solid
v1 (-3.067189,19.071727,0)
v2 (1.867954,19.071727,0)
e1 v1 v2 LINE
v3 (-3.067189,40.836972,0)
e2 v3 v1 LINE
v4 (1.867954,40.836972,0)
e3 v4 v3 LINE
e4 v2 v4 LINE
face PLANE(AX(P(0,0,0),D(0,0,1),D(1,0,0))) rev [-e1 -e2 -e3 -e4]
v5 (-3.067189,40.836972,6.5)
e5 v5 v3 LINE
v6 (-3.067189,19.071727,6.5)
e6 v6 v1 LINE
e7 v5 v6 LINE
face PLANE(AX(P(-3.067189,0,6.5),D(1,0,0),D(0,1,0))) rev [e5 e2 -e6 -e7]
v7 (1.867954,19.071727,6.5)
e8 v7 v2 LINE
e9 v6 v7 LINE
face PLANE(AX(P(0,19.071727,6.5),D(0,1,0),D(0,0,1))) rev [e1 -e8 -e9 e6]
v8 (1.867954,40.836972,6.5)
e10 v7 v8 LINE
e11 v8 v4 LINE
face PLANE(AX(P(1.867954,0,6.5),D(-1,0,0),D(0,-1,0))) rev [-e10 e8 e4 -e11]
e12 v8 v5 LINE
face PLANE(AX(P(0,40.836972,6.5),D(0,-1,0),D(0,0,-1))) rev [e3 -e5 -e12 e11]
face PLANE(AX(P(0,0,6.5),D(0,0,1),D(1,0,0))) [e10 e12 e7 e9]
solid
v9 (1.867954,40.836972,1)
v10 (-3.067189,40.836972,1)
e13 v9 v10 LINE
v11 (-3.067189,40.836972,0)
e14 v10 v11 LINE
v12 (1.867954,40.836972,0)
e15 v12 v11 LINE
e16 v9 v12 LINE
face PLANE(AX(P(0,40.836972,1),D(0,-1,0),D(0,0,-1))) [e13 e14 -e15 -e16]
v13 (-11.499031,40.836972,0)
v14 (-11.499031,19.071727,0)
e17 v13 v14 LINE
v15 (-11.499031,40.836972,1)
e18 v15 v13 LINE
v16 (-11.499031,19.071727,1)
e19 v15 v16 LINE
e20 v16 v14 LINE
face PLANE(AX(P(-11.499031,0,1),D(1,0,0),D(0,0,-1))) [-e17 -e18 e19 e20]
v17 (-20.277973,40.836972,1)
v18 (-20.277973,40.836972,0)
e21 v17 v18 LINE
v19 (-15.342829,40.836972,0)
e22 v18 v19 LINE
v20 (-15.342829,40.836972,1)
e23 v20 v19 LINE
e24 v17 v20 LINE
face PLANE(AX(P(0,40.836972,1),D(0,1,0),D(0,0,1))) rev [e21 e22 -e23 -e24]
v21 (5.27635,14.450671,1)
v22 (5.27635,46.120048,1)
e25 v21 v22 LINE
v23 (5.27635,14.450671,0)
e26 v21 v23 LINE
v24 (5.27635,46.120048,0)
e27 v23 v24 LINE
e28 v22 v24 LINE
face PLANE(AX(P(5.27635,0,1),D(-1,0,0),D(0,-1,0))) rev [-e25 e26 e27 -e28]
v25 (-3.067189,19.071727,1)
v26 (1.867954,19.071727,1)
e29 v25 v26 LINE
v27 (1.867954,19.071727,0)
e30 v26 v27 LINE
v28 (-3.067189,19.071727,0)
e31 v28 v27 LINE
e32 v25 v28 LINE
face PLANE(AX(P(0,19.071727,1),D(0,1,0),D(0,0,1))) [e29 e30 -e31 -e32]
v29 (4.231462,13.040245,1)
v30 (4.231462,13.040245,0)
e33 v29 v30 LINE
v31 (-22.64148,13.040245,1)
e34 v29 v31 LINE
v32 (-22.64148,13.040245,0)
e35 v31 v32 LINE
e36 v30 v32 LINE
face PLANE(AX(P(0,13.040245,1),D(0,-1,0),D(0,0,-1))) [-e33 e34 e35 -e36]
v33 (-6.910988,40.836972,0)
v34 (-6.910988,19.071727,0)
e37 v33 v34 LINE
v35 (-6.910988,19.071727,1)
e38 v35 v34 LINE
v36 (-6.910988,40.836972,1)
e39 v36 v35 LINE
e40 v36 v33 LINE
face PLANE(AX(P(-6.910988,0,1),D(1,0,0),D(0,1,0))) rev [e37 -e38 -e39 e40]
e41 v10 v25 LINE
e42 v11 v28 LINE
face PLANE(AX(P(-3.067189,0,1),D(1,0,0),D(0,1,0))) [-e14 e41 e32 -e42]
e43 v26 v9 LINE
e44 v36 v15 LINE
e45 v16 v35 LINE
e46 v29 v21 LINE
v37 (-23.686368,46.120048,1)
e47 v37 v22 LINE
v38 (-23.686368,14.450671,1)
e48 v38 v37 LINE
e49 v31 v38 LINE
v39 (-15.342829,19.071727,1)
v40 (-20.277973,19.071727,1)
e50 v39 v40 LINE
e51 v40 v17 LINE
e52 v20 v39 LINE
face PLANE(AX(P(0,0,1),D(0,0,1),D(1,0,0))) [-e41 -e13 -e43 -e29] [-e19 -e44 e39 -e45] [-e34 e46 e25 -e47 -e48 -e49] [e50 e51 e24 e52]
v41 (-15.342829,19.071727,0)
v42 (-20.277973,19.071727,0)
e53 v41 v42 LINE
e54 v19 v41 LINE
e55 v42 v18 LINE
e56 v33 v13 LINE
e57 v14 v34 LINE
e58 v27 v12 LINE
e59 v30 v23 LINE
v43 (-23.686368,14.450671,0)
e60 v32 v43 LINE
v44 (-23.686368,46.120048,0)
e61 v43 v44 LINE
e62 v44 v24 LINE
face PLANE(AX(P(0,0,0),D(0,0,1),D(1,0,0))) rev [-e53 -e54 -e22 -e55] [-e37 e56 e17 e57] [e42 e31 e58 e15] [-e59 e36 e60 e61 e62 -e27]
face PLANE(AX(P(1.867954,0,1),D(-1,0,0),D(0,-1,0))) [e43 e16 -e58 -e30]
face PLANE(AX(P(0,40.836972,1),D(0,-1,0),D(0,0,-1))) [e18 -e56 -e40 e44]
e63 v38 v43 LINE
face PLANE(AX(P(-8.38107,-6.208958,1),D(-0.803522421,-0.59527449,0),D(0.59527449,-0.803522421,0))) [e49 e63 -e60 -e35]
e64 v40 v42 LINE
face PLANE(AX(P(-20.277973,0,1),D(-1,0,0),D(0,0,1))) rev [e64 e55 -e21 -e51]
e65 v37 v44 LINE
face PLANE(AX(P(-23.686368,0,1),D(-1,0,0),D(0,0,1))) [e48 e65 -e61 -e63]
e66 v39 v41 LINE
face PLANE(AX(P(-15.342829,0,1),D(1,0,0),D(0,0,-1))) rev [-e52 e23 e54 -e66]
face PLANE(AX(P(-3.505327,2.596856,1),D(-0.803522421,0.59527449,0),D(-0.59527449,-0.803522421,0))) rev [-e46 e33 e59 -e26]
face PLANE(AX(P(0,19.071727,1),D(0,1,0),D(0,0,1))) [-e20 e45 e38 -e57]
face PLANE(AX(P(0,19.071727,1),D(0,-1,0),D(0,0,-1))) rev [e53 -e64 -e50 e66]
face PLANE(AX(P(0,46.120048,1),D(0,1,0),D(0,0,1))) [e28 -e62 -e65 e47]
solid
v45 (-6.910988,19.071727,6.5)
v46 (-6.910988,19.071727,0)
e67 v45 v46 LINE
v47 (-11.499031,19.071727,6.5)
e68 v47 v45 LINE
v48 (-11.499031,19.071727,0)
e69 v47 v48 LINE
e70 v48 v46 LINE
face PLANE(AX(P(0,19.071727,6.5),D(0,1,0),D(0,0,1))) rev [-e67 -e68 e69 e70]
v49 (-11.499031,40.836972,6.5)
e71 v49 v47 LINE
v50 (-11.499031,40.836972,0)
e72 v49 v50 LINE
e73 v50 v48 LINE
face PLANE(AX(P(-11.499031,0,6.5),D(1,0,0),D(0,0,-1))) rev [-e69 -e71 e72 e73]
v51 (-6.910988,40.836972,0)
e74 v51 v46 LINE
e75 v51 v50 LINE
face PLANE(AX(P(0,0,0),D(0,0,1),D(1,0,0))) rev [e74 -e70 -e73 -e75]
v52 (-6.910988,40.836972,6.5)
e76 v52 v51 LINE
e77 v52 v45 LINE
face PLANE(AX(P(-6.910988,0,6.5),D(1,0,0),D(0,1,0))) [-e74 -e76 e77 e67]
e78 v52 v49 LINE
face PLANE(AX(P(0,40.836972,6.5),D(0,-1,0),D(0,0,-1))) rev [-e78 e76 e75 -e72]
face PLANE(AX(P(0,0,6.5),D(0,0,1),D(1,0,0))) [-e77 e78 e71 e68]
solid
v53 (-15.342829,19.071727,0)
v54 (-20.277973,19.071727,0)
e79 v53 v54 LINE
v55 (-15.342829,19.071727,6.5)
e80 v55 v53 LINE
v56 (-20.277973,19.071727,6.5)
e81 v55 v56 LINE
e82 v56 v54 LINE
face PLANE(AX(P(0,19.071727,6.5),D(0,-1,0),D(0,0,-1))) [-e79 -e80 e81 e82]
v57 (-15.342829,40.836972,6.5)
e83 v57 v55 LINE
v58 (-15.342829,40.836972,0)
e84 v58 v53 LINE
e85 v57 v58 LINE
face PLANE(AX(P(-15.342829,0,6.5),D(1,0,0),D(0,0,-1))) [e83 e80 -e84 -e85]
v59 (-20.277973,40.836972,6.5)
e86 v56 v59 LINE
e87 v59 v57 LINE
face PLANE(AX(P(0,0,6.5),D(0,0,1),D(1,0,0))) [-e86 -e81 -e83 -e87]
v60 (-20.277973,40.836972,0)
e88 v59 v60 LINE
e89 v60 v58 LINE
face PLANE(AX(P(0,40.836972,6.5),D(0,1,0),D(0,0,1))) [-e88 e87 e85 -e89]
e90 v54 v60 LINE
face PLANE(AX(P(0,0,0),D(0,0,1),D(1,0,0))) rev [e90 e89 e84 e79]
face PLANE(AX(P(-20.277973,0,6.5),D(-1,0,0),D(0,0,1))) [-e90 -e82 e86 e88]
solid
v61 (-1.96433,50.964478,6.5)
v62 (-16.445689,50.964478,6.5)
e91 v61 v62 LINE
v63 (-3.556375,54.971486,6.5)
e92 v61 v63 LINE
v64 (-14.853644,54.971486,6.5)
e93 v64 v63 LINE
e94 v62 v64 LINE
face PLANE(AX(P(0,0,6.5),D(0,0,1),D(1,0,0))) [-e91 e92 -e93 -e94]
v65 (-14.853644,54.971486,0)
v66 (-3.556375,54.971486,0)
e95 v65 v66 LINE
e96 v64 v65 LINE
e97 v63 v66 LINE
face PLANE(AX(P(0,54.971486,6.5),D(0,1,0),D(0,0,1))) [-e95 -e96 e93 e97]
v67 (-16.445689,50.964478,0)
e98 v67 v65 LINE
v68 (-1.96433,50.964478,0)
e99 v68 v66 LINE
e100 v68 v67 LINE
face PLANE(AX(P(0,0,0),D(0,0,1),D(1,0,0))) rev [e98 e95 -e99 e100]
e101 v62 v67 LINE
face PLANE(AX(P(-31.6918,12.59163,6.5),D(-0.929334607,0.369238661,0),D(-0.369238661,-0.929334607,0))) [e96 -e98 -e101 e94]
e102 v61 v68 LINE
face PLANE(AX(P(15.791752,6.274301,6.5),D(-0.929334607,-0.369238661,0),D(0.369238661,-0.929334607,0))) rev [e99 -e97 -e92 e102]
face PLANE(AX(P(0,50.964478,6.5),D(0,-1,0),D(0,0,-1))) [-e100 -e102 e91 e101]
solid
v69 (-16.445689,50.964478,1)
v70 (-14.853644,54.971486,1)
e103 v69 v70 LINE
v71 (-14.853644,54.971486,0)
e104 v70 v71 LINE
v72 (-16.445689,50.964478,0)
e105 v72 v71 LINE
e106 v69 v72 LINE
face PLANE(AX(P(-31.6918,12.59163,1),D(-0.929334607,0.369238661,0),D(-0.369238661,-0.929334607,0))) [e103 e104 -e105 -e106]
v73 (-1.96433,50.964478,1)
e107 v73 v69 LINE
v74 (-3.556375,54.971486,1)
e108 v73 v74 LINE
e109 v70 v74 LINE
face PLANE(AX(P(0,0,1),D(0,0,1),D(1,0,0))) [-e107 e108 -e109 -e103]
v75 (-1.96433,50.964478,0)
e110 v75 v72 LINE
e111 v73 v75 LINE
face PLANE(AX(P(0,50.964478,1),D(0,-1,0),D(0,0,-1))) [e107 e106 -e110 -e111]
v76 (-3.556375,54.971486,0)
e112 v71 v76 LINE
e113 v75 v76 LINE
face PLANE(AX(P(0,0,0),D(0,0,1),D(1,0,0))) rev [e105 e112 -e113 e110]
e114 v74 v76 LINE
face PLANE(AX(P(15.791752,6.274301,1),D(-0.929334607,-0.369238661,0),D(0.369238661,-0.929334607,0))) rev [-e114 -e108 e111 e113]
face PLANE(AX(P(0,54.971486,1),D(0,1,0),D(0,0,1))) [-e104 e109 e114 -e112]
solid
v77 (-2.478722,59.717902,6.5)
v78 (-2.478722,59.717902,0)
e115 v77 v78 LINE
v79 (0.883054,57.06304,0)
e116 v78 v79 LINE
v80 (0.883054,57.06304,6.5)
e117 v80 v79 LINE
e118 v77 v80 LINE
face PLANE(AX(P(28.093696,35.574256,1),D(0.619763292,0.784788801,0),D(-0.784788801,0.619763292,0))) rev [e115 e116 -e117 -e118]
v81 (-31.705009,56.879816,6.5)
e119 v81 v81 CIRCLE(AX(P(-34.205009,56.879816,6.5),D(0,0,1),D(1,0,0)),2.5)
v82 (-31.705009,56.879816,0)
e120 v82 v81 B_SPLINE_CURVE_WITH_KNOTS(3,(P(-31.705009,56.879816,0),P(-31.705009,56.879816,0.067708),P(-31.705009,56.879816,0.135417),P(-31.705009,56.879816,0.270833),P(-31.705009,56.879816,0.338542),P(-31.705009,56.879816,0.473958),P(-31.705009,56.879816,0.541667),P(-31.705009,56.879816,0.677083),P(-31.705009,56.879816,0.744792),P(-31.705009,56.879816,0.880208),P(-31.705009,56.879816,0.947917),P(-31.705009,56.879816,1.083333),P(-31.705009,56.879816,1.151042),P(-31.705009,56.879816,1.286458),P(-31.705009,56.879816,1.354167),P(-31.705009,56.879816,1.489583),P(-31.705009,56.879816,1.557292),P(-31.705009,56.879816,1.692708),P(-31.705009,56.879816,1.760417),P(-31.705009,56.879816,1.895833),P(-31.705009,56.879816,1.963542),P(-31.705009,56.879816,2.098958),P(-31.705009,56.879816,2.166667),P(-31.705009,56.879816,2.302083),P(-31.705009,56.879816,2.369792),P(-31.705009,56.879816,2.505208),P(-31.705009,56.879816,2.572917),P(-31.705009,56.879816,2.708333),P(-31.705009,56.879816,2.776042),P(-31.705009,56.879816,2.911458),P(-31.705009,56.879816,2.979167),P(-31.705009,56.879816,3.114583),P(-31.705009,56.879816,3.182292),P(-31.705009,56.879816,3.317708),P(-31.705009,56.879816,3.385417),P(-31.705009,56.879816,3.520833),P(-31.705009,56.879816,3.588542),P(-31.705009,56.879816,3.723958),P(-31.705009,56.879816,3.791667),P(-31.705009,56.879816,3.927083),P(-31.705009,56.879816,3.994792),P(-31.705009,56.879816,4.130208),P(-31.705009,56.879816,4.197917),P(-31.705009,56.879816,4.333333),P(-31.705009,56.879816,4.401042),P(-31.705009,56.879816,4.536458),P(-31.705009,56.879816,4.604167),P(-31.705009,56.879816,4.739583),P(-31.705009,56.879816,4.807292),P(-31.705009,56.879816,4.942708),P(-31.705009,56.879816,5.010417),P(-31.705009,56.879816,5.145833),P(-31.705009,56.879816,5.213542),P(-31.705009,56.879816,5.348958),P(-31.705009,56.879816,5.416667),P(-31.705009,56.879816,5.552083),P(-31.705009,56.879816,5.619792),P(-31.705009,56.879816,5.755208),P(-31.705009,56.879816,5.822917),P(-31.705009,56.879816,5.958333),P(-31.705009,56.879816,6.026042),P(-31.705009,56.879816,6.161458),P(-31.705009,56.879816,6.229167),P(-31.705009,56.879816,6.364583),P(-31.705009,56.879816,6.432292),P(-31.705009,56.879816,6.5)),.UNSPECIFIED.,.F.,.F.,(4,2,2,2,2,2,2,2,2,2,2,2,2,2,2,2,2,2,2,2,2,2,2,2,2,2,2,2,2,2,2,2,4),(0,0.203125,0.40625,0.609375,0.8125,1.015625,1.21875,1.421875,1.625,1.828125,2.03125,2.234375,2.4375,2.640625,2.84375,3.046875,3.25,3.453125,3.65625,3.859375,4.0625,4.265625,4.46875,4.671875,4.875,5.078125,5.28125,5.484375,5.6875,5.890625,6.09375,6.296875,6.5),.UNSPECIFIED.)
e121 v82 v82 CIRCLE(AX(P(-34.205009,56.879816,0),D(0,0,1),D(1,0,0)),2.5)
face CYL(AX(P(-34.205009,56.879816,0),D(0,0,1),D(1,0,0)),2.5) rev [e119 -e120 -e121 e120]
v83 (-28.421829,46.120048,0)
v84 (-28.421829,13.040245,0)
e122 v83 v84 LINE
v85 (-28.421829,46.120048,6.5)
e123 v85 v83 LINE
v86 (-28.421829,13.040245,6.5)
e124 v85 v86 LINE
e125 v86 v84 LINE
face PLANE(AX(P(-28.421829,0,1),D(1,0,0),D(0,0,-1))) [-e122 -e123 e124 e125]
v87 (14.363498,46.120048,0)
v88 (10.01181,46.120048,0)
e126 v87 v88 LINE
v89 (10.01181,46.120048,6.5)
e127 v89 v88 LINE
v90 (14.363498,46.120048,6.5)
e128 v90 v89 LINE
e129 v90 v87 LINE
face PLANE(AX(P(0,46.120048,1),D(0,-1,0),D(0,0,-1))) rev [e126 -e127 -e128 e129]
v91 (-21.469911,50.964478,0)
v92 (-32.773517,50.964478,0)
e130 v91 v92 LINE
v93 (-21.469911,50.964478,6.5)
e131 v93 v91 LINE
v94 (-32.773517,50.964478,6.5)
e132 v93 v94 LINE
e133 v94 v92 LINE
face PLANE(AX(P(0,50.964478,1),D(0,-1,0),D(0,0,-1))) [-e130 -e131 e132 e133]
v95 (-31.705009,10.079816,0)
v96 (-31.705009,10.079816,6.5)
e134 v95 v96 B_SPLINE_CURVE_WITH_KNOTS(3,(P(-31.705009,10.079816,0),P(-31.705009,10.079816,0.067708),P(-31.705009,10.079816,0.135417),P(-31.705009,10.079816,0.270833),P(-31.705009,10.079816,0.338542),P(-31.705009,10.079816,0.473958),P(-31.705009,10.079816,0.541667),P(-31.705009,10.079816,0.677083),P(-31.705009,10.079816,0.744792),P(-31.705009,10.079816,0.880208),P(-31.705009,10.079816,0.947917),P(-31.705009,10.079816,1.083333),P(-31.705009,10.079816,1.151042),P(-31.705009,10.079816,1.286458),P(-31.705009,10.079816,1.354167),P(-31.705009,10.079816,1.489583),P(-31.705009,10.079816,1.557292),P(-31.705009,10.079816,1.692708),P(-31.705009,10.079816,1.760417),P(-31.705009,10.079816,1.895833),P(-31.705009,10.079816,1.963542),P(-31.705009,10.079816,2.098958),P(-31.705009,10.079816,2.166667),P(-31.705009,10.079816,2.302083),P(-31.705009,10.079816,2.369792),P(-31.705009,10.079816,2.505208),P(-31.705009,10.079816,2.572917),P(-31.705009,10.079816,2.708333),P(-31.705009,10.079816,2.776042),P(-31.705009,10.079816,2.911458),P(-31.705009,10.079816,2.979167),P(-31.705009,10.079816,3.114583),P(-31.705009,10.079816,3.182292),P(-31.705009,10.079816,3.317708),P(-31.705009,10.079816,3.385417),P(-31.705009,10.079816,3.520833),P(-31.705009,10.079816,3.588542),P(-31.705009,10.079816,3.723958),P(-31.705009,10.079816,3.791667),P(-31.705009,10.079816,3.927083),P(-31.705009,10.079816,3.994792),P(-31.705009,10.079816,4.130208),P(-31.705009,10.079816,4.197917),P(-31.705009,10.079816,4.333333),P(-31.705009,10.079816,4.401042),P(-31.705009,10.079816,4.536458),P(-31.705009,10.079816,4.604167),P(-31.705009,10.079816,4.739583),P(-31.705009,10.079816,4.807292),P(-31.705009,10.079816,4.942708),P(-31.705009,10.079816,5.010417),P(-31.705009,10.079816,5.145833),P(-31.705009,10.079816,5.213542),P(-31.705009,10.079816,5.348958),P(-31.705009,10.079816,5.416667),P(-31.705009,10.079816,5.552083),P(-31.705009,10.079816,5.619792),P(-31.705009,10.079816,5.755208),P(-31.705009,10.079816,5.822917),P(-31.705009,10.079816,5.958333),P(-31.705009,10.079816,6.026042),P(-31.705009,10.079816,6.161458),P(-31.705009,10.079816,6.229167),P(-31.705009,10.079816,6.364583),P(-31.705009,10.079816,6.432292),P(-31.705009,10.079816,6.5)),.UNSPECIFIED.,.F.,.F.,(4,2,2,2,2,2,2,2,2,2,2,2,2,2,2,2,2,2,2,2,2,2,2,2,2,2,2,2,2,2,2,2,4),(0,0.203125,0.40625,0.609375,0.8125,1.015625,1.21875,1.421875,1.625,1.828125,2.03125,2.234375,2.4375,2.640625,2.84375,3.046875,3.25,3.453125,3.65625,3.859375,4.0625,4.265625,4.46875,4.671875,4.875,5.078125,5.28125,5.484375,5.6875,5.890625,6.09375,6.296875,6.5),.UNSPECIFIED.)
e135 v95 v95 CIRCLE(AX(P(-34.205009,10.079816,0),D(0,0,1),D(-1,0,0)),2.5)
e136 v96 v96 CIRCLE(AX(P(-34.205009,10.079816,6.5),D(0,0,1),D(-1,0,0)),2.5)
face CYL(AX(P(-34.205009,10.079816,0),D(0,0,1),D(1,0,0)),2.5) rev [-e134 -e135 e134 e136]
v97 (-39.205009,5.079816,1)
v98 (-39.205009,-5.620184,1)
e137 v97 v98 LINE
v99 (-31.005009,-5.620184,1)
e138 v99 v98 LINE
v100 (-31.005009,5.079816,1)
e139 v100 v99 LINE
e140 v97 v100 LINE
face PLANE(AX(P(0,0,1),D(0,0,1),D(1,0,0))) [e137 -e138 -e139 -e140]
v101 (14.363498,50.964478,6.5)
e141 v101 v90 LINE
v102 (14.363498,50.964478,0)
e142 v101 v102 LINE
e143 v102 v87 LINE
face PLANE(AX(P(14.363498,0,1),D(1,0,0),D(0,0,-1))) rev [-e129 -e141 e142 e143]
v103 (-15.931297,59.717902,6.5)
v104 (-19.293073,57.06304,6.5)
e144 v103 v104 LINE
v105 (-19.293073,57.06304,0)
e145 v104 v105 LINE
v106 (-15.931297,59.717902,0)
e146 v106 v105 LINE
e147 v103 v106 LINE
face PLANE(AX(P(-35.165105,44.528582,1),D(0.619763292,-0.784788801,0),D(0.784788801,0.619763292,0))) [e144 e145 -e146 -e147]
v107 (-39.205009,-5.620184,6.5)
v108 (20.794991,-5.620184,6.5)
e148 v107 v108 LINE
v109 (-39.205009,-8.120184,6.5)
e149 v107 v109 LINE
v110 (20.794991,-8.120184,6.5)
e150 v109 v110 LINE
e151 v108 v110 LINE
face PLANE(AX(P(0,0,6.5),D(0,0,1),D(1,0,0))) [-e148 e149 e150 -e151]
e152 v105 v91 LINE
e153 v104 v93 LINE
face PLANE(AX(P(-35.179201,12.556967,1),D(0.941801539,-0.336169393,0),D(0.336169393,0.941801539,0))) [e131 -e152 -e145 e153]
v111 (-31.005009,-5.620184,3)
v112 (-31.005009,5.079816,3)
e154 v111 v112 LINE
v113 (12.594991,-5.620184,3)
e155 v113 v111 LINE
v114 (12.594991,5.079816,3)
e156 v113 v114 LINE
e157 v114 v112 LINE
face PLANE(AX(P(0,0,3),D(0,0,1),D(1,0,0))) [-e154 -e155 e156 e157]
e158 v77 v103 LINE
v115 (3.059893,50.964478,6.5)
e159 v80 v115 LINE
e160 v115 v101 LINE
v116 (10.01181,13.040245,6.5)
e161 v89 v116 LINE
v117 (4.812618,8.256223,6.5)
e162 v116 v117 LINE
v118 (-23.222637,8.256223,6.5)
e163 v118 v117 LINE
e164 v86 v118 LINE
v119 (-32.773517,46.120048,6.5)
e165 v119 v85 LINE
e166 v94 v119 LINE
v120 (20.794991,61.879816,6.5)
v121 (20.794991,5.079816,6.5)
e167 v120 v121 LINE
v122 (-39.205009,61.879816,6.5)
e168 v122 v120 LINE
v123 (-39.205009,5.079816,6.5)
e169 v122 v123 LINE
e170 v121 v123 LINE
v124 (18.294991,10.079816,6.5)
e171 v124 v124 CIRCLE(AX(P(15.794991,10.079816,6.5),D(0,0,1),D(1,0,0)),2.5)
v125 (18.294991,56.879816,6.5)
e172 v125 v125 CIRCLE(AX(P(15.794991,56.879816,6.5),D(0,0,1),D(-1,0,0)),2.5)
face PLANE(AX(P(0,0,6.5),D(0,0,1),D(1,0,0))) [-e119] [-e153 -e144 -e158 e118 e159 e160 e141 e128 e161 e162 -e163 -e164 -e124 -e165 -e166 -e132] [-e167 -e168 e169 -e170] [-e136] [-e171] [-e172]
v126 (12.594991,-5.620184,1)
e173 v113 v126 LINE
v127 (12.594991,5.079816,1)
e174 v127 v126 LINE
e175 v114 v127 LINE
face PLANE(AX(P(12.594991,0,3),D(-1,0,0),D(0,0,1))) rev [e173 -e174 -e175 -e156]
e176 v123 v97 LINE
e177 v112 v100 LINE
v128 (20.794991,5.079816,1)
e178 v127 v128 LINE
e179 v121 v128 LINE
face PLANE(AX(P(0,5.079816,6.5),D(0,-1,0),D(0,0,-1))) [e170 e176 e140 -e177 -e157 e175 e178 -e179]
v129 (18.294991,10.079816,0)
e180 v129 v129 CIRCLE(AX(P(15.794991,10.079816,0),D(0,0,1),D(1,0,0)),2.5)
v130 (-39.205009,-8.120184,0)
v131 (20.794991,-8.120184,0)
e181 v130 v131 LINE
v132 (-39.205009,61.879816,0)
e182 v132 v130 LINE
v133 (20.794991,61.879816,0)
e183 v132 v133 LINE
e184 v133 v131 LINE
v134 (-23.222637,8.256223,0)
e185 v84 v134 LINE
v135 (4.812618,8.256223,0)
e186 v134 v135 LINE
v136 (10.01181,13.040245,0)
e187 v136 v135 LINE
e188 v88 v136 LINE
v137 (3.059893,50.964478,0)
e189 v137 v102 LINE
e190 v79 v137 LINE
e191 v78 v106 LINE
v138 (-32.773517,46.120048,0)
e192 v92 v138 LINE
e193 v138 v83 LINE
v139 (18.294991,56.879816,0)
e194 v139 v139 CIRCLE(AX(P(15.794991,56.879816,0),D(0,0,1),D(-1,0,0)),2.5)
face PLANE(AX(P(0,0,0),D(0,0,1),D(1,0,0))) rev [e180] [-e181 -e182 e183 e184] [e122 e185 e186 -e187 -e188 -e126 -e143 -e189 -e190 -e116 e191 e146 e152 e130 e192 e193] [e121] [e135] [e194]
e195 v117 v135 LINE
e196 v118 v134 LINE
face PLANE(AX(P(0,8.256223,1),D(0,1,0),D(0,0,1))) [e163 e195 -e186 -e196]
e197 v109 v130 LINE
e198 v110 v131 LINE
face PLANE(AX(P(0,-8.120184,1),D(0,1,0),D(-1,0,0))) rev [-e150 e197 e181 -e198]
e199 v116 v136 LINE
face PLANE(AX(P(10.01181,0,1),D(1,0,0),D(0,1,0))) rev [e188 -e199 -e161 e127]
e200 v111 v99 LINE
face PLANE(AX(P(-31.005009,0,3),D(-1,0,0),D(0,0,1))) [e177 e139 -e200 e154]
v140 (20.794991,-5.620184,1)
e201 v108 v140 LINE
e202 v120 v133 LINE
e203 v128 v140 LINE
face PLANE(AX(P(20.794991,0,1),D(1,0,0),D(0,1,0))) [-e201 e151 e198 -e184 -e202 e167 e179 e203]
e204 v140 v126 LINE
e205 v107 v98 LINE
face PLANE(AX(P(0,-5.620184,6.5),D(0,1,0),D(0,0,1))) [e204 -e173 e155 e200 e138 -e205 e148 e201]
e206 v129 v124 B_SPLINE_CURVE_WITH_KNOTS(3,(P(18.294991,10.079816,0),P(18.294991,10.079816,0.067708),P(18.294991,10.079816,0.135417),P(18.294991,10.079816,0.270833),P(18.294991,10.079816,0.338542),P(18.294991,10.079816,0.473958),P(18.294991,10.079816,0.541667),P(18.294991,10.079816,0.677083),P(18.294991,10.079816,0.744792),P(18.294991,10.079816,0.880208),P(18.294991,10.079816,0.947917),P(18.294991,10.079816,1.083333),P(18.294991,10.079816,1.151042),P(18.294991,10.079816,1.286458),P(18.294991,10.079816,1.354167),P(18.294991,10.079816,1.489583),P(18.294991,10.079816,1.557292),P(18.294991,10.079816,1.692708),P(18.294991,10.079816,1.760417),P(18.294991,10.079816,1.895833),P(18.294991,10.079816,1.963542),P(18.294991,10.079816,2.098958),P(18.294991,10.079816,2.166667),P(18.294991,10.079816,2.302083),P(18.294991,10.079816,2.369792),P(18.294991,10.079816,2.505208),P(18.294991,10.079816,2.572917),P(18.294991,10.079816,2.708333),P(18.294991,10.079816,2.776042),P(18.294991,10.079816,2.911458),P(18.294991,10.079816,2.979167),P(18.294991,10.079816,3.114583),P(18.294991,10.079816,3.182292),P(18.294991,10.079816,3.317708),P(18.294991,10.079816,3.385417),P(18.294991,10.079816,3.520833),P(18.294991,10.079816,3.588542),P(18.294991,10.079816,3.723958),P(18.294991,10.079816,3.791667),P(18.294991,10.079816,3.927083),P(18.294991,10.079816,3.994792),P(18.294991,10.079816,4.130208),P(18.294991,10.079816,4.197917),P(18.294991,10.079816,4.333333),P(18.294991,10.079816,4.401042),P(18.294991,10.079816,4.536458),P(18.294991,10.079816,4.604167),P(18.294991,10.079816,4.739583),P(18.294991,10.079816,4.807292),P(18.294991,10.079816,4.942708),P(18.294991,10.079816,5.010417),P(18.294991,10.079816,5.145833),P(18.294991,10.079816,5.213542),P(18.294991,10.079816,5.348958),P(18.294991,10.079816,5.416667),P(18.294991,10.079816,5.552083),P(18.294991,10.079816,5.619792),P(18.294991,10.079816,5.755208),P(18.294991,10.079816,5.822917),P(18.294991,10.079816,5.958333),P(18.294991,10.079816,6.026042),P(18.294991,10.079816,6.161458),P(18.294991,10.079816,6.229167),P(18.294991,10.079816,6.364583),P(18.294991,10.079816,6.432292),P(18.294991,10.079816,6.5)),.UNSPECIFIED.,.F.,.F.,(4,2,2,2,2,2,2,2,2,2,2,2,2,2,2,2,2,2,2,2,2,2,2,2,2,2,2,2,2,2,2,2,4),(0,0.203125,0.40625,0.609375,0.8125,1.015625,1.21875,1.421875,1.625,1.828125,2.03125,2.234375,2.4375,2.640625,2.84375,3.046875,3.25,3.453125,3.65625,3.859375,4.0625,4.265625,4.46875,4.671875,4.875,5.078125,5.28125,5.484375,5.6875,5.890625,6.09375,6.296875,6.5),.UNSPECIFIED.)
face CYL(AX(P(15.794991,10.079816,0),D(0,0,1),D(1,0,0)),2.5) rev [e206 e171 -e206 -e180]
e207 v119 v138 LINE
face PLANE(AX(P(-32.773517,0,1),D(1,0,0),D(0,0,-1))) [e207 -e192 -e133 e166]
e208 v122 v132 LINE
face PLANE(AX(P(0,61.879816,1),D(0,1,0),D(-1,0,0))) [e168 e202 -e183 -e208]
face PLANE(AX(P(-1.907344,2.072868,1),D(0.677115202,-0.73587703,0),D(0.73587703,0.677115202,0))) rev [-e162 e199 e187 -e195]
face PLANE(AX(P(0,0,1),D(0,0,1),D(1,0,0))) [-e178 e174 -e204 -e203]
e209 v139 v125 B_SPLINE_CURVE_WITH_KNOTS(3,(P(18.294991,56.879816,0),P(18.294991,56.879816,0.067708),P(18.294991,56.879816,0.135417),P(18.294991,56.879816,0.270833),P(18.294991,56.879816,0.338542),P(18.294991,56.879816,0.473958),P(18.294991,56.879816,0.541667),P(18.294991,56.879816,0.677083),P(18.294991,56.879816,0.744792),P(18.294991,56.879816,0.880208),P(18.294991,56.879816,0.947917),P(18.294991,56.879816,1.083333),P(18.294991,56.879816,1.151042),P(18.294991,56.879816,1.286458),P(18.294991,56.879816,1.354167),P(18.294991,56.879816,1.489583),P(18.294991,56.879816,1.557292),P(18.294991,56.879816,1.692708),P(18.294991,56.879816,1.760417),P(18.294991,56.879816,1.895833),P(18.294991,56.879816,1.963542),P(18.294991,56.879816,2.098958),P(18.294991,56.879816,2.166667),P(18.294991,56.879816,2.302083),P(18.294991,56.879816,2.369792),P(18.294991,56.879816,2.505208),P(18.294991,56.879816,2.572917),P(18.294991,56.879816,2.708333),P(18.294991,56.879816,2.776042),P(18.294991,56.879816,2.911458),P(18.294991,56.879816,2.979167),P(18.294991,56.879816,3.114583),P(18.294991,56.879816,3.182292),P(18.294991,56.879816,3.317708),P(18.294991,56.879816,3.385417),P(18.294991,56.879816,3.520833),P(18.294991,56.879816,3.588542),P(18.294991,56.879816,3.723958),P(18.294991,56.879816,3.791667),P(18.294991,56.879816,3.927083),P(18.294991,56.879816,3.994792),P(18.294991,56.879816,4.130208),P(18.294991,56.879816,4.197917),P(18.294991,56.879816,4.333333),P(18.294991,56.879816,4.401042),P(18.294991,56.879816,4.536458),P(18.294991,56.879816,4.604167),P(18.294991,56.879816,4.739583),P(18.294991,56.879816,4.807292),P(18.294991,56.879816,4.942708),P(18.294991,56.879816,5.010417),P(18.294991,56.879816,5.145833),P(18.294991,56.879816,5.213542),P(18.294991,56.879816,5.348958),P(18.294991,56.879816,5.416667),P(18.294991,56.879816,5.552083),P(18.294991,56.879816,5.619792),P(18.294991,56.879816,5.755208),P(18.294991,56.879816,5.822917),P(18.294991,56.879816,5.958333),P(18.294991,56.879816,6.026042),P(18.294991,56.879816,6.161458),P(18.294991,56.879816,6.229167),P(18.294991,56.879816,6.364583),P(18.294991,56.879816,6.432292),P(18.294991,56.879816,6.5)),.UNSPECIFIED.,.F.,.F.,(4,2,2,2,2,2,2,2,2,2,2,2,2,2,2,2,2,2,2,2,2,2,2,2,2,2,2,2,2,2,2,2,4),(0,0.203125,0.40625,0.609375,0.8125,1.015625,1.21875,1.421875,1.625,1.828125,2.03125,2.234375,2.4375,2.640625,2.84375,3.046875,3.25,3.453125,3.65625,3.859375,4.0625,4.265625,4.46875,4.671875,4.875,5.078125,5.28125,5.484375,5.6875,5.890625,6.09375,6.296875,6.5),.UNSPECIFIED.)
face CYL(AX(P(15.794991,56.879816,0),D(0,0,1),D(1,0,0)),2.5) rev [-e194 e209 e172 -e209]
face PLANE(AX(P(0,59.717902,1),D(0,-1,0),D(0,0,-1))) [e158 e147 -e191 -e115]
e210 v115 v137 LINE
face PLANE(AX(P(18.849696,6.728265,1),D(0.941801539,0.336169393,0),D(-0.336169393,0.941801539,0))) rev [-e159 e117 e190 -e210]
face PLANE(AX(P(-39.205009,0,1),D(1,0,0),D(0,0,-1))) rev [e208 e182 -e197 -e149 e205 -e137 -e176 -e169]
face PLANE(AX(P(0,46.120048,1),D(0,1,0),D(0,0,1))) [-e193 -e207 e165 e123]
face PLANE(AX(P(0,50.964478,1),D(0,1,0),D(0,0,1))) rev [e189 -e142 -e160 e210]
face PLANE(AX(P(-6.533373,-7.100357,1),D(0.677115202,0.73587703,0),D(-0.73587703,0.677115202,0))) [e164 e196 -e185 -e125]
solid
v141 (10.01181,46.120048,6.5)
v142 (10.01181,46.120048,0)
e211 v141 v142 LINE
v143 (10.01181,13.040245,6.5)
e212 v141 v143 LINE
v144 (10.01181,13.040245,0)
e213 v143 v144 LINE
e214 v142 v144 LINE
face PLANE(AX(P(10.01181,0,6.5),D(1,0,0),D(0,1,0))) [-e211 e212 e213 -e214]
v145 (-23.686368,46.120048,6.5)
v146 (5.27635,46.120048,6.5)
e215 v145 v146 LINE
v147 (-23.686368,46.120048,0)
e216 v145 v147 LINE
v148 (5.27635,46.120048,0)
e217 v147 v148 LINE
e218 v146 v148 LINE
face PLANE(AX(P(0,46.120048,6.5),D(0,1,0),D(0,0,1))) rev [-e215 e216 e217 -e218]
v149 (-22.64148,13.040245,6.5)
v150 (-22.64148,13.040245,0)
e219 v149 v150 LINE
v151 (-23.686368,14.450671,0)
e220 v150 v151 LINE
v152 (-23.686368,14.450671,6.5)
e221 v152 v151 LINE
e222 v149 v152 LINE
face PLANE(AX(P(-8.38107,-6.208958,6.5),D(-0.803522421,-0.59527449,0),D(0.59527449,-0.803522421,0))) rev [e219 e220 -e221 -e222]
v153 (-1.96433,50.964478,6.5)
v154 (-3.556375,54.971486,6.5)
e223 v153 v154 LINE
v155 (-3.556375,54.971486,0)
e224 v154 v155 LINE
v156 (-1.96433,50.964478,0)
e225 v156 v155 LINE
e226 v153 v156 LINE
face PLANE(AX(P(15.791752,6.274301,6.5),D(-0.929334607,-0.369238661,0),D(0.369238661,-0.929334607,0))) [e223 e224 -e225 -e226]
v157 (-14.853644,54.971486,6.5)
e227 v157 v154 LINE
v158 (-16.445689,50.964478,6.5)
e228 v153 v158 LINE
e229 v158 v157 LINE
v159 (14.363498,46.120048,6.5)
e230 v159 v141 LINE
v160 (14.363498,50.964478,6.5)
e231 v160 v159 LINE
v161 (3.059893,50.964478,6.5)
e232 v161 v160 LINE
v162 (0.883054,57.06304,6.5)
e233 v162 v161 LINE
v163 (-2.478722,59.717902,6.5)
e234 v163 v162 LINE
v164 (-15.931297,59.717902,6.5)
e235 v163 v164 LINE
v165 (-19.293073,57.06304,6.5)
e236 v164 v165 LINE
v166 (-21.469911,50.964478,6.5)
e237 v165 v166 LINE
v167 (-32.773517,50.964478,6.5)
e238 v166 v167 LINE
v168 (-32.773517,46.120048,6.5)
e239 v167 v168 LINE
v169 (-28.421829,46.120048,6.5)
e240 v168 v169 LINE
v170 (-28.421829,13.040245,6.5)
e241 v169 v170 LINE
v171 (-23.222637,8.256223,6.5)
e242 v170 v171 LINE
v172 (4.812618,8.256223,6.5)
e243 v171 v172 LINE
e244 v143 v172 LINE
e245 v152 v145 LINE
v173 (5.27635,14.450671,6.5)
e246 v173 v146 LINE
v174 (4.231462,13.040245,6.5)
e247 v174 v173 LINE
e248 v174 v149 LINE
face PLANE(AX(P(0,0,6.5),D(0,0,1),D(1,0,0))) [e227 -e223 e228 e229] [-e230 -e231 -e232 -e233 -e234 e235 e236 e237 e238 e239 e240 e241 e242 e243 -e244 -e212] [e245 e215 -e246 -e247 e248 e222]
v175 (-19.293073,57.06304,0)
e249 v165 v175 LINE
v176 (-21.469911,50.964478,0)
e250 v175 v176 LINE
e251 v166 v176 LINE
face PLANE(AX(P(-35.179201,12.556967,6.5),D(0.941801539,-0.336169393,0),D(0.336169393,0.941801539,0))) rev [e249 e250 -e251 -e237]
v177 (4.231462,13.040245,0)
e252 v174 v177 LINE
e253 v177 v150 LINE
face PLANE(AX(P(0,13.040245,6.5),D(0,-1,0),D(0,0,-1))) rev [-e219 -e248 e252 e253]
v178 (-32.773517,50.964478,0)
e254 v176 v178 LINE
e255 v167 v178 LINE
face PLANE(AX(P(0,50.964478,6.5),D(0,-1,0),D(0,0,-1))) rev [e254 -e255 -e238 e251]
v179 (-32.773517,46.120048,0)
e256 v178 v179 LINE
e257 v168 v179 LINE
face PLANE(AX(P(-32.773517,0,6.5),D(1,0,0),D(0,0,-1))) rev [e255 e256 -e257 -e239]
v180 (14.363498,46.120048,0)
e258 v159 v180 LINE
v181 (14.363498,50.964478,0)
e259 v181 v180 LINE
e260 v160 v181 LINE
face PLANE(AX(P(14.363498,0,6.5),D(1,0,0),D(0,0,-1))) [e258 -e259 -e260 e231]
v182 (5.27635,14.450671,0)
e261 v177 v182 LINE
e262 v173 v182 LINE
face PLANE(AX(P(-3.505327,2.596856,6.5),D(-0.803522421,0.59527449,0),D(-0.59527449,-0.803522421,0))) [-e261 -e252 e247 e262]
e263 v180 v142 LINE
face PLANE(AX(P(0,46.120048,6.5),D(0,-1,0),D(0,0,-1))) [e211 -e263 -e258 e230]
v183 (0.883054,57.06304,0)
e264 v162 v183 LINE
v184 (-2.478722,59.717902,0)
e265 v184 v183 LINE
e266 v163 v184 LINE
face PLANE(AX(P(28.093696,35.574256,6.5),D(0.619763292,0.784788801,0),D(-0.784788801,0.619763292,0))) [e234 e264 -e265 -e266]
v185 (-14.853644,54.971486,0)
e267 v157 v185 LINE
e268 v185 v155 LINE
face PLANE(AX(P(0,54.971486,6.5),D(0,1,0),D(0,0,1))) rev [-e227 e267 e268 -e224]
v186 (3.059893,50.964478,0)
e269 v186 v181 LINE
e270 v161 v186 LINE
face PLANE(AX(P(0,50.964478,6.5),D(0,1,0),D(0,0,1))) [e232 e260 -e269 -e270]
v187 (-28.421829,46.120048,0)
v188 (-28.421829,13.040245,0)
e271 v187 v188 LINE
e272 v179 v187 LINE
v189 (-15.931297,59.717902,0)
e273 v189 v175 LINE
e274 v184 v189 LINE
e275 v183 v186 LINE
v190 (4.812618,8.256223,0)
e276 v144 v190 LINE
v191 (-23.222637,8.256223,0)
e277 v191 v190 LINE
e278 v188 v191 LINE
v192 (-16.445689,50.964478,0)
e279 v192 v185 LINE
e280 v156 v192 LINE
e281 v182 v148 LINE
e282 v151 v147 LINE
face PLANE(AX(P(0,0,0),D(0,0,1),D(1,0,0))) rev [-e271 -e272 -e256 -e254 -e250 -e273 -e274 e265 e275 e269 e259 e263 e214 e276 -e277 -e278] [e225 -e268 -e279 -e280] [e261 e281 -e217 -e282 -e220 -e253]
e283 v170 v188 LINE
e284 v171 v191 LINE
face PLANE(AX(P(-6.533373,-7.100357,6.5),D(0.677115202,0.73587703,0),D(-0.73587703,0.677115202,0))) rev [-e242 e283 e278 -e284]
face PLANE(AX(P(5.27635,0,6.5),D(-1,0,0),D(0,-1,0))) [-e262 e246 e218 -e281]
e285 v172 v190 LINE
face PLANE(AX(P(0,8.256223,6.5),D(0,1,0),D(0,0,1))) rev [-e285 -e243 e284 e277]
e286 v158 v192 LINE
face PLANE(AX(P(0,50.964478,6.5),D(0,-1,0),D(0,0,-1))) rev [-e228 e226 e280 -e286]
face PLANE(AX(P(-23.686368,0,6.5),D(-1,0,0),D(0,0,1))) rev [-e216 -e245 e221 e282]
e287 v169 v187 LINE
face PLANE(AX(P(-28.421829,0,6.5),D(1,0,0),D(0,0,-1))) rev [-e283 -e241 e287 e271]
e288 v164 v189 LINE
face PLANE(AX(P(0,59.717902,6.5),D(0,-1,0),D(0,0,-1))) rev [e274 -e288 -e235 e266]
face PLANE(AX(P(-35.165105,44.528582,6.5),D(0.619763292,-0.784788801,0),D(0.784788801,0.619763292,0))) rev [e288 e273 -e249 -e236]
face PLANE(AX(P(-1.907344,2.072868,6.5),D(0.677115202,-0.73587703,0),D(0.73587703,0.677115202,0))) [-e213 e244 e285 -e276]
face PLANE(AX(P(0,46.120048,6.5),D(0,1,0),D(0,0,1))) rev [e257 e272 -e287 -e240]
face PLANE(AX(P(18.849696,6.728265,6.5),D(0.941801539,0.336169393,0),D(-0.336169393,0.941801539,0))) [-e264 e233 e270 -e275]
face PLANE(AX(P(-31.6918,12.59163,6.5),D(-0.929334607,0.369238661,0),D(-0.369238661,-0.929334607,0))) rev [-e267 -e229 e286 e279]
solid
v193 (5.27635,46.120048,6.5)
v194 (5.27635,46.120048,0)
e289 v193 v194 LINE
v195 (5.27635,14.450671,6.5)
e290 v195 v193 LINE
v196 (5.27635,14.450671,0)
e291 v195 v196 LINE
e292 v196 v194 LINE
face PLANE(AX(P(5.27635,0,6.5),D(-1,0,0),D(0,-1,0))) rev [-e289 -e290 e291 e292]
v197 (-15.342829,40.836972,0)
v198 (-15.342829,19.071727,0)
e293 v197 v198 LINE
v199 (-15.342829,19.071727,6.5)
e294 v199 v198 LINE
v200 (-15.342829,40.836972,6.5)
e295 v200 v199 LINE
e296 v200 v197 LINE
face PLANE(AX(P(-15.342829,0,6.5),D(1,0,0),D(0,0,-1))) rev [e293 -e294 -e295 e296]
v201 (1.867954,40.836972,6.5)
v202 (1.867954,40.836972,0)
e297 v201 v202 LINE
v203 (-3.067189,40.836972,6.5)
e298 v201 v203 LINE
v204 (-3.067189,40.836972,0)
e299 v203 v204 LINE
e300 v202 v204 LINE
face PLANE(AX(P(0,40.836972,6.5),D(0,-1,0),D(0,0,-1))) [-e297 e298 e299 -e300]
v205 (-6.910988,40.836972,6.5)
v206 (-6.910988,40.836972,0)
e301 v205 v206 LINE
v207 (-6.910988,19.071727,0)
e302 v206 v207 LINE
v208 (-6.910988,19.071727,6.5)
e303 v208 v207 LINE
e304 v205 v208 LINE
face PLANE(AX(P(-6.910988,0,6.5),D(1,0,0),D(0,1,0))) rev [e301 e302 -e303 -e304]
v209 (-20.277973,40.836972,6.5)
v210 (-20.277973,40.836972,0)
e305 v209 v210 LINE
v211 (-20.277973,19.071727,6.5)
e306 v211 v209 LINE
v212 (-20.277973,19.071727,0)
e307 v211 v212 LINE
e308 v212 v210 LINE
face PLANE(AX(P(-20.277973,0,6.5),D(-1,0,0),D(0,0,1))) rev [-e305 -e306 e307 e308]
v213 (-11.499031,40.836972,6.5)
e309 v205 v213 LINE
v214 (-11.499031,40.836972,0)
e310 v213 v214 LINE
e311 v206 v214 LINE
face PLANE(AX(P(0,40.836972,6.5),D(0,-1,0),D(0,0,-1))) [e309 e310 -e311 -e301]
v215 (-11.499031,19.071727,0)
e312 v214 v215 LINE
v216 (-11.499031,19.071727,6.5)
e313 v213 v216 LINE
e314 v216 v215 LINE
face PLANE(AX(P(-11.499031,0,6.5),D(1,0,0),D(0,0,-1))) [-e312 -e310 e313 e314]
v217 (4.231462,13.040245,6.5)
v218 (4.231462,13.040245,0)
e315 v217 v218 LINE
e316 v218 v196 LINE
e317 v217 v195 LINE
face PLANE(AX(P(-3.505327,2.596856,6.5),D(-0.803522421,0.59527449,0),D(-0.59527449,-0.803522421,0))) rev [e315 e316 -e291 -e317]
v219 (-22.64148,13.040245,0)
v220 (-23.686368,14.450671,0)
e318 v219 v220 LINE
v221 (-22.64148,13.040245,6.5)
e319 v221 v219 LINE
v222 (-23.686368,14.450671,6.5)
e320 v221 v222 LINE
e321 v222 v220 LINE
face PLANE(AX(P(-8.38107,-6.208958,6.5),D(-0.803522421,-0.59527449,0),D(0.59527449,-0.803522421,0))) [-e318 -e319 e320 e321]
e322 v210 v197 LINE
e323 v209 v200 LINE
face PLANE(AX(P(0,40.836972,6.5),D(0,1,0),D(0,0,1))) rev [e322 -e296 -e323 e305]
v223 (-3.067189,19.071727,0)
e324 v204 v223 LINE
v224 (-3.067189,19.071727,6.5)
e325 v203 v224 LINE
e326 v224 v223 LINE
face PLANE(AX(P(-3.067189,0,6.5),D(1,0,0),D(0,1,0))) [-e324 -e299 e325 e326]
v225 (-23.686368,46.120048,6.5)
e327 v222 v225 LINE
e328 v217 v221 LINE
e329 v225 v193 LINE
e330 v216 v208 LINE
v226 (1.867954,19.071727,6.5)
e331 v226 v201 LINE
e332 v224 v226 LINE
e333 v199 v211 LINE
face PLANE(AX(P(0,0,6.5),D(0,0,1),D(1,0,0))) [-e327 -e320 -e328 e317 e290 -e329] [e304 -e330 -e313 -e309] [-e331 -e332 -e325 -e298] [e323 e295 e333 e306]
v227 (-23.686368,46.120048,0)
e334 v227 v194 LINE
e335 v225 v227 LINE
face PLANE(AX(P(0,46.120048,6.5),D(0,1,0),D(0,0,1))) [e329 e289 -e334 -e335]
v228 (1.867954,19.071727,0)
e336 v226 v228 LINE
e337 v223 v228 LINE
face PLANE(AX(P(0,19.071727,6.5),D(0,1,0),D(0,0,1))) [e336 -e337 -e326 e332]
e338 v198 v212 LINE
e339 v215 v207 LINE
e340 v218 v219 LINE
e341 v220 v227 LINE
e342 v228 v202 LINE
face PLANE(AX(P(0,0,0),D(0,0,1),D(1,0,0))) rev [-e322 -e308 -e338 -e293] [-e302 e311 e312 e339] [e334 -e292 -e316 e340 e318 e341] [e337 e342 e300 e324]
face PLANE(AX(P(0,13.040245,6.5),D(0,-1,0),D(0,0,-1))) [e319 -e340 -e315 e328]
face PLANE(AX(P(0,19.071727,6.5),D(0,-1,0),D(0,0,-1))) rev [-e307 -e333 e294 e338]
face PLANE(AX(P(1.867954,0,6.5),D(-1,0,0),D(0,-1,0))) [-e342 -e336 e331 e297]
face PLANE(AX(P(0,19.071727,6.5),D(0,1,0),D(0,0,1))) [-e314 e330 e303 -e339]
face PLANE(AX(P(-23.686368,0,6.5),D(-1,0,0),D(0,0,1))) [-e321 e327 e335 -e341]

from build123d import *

# Parameters (mm, degrees)
SKETCH1_W               = 60
SKETCH1_H               = 70
BACK_PLATE_DEPTH        = 1
SKETCH1_W_2             = 4.935143629
SKETCH1_H_2             = 21.765245327
SKETCH1_W_3             = 4.588042919
SKETCH1_W_4             = 4.93514363
BACK_PLATE_2_DEPTH      = 1
BACK_PLATE_3_DEPTH      = 1
SKETCH1_4_W             = 43.6
SKETCH1_4_H             = 10.7
NEOPIXEL_BACK_DEPTH     = 3
SKETCH1_5_W             = 60
SKETCH1_5_H             = 56.8
SKETCH1_5_H_2           = 2.5
SKETCH1_5_W_2           = 4.935143629
SKETCH1_5_H_3           = 21.765245327
SKETCH1_5_W_3           = 4.588042919
SKETCH1_5_W_4           = 4.93514363
MAIN_COLOR_DEPTH        = 6.5
SKETCH2_R               = 2.5
MOUNTING_HOLES_DEPTH    = 6.5
HIGHLIGHT_COLOR_DEPTH   = 6.5
SKETCH1_7_W             = 4.588042919
SKETCH1_7_H             = 21.765245327
HIGHLIGHT_COLOR_2_DEPTH = 6.5
SKETCH1_7_W_2           = 4.935143629
HIGHLIGHT_COLOR_3_DEPTH = 6.5
SKETCH1_7_W_3           = 4.93514363
HIGHLIGHT_COLOR_4_DEPTH = 6.5


with BuildPart() as part:
    # Sketch1 → Back Plate (new body)
    with BuildSketch(Plane.XY):
        with Locations((-9.205009354, 26.879816243)):
            Rectangle(SKETCH1_W, SKETCH1_H)
        Polygon((-15.931296548, 59.717901756), (-2.47872216, 59.717901756), (0.883053973, 57.06304042), (3.059892719, 50.964477844), (14.363498017, 50.964477844), (14.363498017, 46.120048266), (10.011810175, 46.120048266), (10.011810175, 13.040245025), (4.81261813, 8.256222922), (-23.222636838, 8.256222922), (-28.421828882, 13.040245025), (-28.421828882, 46.120048266), (-32.773516724, 46.120048266), (-32.773516724, 50.964477844), (-21.469911426, 50.964477844), (-19.293072681, 57.06304042), align=None, mode=Mode.SUBTRACT)
    extrude(amount=BACK_PLATE_DEPTH)

    # Sketch1<4> → Neopixel Back (add)
    with BuildSketch(Plane.XY):
        with Locations((-9.205009354, -0.270183757)):
            Rectangle(SKETCH1_4_W, SKETCH1_4_H)
    extrude(amount=NEOPIXEL_BACK_DEPTH)

    # Sketch1<5> → Main Color (add)
    # profile 1 of 4: a face of its own
    with BuildSketch(Plane.XY):
        with Locations((-9.205009354, 33.479816243)):
            Rectangle(SKETCH1_5_W, SKETCH1_5_H)
        Polygon((-15.931296548, 59.717901756), (-2.47872216, 59.717901756), (0.883053973, 57.06304042), (3.059892719, 50.964477844), (14.363498017, 50.964477844), (14.363498017, 46.120048266), (10.011810175, 46.120048266), (10.011810175, 13.040245025), (4.81261813, 8.256222922), (-23.222636838, 8.256222922), (-28.421828882, 13.040245025), (-28.421828882, 46.120048266), (-32.773516724, 46.120048266), (-32.773516724, 50.964477844), (-21.469911426, 50.964477844), (-19.293072681, 57.06304042), align=None, mode=Mode.SUBTRACT)
    # profile 2 of 4: a face of its own
    with BuildSketch(Plane.XY):
        with Locations((-9.205009354, -6.870183757)):
            Rectangle(SKETCH1_5_W, SKETCH1_5_H_2)
    # profile 3 of 4: a face of its own
    with BuildSketch(Plane.XY):
        Polygon((-22.641480327, 13.040245025), (4.231461619, 13.040245025), (5.27634955, 14.450671464), (5.27634955, 46.120048266), (-23.686368257, 46.120048266), (-23.686368257, 14.450671464), align=None)
        with Locations((-17.810401185, 29.954349556)):
            Rectangle(SKETCH1_5_W_2, SKETCH1_5_H_3, mode=Mode.SUBTRACT)
        with Locations((-9.205009354, 29.954349556)):
            Rectangle(SKETCH1_5_W_3, SKETCH1_5_H_3, mode=Mode.SUBTRACT)
        with Locations((-0.599617523, 29.954349556)):
            Rectangle(SKETCH1_5_W_4, SKETCH1_5_H_3, mode=Mode.SUBTRACT)
    # profile 4 of 4: a face of its own
    with BuildSketch(Plane.XY):
        Polygon((-16.445688805, 50.964477844), (-1.964329902, 50.964477844), (-3.556374782, 54.971486207), (-14.853643925, 54.971486207), align=None)
    extrude(amount=MAIN_COLOR_DEPTH)


with BuildPart() as body_2:
    # Sketch1 → Back Plate 2 (new body)
    with BuildSketch(Plane.XY):
        Polygon((-22.641480327, 13.040245025), (4.231461619, 13.040245025), (5.27634955, 14.450671464), (5.27634955, 46.120048266), (-23.686368257, 46.120048266), (-23.686368257, 14.450671464), align=None)
        with Locations((-17.810401185, 29.954349556)):
            Rectangle(SKETCH1_W_2, SKETCH1_H_2, mode=Mode.SUBTRACT)
        with Locations((-9.205009354, 29.954349556)):
            Rectangle(SKETCH1_W_3, SKETCH1_H_2, mode=Mode.SUBTRACT)
        with Locations((-0.599617523, 29.954349556)):
            Rectangle(SKETCH1_W_4, SKETCH1_H_2, mode=Mode.SUBTRACT)
    extrude(amount=BACK_PLATE_2_DEPTH)


with BuildPart() as body_3:
    # Sketch1 → Back Plate 3 (new body)
    with BuildSketch(Plane.XY):
        Polygon((-16.445688805, 50.964477844), (-1.964329902, 50.964477844), (-3.556374782, 54.971486207), (-14.853643925, 54.971486207), align=None)
    extrude(amount=BACK_PLATE_3_DEPTH)


with BuildPart() as main_color_piece_1:
    # of the separate pieces the step leaves, piece 1, a body of its own (main_color_pieces)
    add(part.part.solids().sort_by_distance((20.794990646, 61.879816243, 6.5))[0])

    # Sketch2 → Mounting Holes (cut)
    with BuildSketch(Plane.XY.offset(6.5)):
        with Locations((-34.205009354, 56.879816243)):
            Circle(SKETCH2_R)
        with Locations((15.794990646, 56.879816243)):
            Circle(SKETCH2_R)
        with Locations((-34.205009354, 10.079816243)):
            Circle(SKETCH2_R)
        with Locations((15.794990646, 10.079816243)):
            Circle(SKETCH2_R)
    extrude(amount=-MOUNTING_HOLES_DEPTH, mode=Mode.SUBTRACT)


with BuildPart() as main_color_piece_2:
    # of the separate pieces the step leaves, piece 2, a body of its own (main_color_pieces)
    add(part.part.solids().sort_by_distance((-22.641480327, 13.040245025, 0))[0])


with BuildPart() as main_color_piece_3:
    # of the separate pieces the step leaves, piece 3, a body of its own (main_color_pieces)
    add(part.part.solids().sort_by_distance((-16.445688805, 50.964477844, 0))[0])


with BuildPart() as body_6:
    # Sketch1<7> → Highlight Color (new body)
    with BuildSketch(Plane.XY):
        Polygon((0.883053973, 57.06304042), (-2.47872216, 59.717901756), (-15.931296548, 59.717901756), (-19.293072681, 57.06304042), (-21.469911426, 50.964477844), (-32.773516724, 50.964477844), (-32.773516724, 46.120048266), (-28.421828882, 46.120048266), (-28.421828882, 13.040245025), (-23.222636838, 8.256222922), (4.81261813, 8.256222922), (10.011810175, 13.040245025), (10.011810175, 46.120048266), (14.363498017, 46.120048266), (14.363498017, 50.964477844), (3.059892719, 50.964477844), align=None)
        Polygon((5.27634955, 14.450671464), (4.231461619, 13.040245025), (-22.641480327, 13.040245025), (-23.686368257, 14.450671464), (-23.686368257, 46.120048266), (5.27634955, 46.120048266), align=None, mode=Mode.SUBTRACT)
        Polygon((-3.556374782, 54.971486207), (-1.964329902, 50.964477844), (-16.445688805, 50.964477844), (-14.853643925, 54.971486207), align=None, mode=Mode.SUBTRACT)
    extrude(amount=HIGHLIGHT_COLOR_DEPTH)


with BuildPart() as body_7:
    # Sketch1<7> → Highlight Color 2 (new body)
    with BuildSketch(Plane.XY):
        with Locations((-9.205009354, 29.954349556)):
            Rectangle(SKETCH1_7_W, SKETCH1_7_H)
    extrude(amount=HIGHLIGHT_COLOR_2_DEPTH)


with BuildPart() as body_8:
    # Sketch1<7> → Highlight Color 3 (new body)
    with BuildSketch(Plane.XY):
        with Locations((-17.810401185, 29.954349556)):
            Rectangle(SKETCH1_7_W_2, SKETCH1_7_H)
    extrude(amount=HIGHLIGHT_COLOR_3_DEPTH)


with BuildPart() as body_9:
    # Sketch1<7> → Highlight Color 4 (new body)
    with BuildSketch(Plane.XY):
        with Locations((-0.599617523, 29.954349556)):
            Rectangle(SKETCH1_7_W_3, SKETCH1_7_H)
    extrude(amount=HIGHLIGHT_COLOR_4_DEPTH)


solid = Compound([body_2.part, body_3.part, main_color_piece_1.part, main_color_piece_2.part, main_color_piece_3.part, body_6.part, body_7.part, body_8.part, body_9.part])
